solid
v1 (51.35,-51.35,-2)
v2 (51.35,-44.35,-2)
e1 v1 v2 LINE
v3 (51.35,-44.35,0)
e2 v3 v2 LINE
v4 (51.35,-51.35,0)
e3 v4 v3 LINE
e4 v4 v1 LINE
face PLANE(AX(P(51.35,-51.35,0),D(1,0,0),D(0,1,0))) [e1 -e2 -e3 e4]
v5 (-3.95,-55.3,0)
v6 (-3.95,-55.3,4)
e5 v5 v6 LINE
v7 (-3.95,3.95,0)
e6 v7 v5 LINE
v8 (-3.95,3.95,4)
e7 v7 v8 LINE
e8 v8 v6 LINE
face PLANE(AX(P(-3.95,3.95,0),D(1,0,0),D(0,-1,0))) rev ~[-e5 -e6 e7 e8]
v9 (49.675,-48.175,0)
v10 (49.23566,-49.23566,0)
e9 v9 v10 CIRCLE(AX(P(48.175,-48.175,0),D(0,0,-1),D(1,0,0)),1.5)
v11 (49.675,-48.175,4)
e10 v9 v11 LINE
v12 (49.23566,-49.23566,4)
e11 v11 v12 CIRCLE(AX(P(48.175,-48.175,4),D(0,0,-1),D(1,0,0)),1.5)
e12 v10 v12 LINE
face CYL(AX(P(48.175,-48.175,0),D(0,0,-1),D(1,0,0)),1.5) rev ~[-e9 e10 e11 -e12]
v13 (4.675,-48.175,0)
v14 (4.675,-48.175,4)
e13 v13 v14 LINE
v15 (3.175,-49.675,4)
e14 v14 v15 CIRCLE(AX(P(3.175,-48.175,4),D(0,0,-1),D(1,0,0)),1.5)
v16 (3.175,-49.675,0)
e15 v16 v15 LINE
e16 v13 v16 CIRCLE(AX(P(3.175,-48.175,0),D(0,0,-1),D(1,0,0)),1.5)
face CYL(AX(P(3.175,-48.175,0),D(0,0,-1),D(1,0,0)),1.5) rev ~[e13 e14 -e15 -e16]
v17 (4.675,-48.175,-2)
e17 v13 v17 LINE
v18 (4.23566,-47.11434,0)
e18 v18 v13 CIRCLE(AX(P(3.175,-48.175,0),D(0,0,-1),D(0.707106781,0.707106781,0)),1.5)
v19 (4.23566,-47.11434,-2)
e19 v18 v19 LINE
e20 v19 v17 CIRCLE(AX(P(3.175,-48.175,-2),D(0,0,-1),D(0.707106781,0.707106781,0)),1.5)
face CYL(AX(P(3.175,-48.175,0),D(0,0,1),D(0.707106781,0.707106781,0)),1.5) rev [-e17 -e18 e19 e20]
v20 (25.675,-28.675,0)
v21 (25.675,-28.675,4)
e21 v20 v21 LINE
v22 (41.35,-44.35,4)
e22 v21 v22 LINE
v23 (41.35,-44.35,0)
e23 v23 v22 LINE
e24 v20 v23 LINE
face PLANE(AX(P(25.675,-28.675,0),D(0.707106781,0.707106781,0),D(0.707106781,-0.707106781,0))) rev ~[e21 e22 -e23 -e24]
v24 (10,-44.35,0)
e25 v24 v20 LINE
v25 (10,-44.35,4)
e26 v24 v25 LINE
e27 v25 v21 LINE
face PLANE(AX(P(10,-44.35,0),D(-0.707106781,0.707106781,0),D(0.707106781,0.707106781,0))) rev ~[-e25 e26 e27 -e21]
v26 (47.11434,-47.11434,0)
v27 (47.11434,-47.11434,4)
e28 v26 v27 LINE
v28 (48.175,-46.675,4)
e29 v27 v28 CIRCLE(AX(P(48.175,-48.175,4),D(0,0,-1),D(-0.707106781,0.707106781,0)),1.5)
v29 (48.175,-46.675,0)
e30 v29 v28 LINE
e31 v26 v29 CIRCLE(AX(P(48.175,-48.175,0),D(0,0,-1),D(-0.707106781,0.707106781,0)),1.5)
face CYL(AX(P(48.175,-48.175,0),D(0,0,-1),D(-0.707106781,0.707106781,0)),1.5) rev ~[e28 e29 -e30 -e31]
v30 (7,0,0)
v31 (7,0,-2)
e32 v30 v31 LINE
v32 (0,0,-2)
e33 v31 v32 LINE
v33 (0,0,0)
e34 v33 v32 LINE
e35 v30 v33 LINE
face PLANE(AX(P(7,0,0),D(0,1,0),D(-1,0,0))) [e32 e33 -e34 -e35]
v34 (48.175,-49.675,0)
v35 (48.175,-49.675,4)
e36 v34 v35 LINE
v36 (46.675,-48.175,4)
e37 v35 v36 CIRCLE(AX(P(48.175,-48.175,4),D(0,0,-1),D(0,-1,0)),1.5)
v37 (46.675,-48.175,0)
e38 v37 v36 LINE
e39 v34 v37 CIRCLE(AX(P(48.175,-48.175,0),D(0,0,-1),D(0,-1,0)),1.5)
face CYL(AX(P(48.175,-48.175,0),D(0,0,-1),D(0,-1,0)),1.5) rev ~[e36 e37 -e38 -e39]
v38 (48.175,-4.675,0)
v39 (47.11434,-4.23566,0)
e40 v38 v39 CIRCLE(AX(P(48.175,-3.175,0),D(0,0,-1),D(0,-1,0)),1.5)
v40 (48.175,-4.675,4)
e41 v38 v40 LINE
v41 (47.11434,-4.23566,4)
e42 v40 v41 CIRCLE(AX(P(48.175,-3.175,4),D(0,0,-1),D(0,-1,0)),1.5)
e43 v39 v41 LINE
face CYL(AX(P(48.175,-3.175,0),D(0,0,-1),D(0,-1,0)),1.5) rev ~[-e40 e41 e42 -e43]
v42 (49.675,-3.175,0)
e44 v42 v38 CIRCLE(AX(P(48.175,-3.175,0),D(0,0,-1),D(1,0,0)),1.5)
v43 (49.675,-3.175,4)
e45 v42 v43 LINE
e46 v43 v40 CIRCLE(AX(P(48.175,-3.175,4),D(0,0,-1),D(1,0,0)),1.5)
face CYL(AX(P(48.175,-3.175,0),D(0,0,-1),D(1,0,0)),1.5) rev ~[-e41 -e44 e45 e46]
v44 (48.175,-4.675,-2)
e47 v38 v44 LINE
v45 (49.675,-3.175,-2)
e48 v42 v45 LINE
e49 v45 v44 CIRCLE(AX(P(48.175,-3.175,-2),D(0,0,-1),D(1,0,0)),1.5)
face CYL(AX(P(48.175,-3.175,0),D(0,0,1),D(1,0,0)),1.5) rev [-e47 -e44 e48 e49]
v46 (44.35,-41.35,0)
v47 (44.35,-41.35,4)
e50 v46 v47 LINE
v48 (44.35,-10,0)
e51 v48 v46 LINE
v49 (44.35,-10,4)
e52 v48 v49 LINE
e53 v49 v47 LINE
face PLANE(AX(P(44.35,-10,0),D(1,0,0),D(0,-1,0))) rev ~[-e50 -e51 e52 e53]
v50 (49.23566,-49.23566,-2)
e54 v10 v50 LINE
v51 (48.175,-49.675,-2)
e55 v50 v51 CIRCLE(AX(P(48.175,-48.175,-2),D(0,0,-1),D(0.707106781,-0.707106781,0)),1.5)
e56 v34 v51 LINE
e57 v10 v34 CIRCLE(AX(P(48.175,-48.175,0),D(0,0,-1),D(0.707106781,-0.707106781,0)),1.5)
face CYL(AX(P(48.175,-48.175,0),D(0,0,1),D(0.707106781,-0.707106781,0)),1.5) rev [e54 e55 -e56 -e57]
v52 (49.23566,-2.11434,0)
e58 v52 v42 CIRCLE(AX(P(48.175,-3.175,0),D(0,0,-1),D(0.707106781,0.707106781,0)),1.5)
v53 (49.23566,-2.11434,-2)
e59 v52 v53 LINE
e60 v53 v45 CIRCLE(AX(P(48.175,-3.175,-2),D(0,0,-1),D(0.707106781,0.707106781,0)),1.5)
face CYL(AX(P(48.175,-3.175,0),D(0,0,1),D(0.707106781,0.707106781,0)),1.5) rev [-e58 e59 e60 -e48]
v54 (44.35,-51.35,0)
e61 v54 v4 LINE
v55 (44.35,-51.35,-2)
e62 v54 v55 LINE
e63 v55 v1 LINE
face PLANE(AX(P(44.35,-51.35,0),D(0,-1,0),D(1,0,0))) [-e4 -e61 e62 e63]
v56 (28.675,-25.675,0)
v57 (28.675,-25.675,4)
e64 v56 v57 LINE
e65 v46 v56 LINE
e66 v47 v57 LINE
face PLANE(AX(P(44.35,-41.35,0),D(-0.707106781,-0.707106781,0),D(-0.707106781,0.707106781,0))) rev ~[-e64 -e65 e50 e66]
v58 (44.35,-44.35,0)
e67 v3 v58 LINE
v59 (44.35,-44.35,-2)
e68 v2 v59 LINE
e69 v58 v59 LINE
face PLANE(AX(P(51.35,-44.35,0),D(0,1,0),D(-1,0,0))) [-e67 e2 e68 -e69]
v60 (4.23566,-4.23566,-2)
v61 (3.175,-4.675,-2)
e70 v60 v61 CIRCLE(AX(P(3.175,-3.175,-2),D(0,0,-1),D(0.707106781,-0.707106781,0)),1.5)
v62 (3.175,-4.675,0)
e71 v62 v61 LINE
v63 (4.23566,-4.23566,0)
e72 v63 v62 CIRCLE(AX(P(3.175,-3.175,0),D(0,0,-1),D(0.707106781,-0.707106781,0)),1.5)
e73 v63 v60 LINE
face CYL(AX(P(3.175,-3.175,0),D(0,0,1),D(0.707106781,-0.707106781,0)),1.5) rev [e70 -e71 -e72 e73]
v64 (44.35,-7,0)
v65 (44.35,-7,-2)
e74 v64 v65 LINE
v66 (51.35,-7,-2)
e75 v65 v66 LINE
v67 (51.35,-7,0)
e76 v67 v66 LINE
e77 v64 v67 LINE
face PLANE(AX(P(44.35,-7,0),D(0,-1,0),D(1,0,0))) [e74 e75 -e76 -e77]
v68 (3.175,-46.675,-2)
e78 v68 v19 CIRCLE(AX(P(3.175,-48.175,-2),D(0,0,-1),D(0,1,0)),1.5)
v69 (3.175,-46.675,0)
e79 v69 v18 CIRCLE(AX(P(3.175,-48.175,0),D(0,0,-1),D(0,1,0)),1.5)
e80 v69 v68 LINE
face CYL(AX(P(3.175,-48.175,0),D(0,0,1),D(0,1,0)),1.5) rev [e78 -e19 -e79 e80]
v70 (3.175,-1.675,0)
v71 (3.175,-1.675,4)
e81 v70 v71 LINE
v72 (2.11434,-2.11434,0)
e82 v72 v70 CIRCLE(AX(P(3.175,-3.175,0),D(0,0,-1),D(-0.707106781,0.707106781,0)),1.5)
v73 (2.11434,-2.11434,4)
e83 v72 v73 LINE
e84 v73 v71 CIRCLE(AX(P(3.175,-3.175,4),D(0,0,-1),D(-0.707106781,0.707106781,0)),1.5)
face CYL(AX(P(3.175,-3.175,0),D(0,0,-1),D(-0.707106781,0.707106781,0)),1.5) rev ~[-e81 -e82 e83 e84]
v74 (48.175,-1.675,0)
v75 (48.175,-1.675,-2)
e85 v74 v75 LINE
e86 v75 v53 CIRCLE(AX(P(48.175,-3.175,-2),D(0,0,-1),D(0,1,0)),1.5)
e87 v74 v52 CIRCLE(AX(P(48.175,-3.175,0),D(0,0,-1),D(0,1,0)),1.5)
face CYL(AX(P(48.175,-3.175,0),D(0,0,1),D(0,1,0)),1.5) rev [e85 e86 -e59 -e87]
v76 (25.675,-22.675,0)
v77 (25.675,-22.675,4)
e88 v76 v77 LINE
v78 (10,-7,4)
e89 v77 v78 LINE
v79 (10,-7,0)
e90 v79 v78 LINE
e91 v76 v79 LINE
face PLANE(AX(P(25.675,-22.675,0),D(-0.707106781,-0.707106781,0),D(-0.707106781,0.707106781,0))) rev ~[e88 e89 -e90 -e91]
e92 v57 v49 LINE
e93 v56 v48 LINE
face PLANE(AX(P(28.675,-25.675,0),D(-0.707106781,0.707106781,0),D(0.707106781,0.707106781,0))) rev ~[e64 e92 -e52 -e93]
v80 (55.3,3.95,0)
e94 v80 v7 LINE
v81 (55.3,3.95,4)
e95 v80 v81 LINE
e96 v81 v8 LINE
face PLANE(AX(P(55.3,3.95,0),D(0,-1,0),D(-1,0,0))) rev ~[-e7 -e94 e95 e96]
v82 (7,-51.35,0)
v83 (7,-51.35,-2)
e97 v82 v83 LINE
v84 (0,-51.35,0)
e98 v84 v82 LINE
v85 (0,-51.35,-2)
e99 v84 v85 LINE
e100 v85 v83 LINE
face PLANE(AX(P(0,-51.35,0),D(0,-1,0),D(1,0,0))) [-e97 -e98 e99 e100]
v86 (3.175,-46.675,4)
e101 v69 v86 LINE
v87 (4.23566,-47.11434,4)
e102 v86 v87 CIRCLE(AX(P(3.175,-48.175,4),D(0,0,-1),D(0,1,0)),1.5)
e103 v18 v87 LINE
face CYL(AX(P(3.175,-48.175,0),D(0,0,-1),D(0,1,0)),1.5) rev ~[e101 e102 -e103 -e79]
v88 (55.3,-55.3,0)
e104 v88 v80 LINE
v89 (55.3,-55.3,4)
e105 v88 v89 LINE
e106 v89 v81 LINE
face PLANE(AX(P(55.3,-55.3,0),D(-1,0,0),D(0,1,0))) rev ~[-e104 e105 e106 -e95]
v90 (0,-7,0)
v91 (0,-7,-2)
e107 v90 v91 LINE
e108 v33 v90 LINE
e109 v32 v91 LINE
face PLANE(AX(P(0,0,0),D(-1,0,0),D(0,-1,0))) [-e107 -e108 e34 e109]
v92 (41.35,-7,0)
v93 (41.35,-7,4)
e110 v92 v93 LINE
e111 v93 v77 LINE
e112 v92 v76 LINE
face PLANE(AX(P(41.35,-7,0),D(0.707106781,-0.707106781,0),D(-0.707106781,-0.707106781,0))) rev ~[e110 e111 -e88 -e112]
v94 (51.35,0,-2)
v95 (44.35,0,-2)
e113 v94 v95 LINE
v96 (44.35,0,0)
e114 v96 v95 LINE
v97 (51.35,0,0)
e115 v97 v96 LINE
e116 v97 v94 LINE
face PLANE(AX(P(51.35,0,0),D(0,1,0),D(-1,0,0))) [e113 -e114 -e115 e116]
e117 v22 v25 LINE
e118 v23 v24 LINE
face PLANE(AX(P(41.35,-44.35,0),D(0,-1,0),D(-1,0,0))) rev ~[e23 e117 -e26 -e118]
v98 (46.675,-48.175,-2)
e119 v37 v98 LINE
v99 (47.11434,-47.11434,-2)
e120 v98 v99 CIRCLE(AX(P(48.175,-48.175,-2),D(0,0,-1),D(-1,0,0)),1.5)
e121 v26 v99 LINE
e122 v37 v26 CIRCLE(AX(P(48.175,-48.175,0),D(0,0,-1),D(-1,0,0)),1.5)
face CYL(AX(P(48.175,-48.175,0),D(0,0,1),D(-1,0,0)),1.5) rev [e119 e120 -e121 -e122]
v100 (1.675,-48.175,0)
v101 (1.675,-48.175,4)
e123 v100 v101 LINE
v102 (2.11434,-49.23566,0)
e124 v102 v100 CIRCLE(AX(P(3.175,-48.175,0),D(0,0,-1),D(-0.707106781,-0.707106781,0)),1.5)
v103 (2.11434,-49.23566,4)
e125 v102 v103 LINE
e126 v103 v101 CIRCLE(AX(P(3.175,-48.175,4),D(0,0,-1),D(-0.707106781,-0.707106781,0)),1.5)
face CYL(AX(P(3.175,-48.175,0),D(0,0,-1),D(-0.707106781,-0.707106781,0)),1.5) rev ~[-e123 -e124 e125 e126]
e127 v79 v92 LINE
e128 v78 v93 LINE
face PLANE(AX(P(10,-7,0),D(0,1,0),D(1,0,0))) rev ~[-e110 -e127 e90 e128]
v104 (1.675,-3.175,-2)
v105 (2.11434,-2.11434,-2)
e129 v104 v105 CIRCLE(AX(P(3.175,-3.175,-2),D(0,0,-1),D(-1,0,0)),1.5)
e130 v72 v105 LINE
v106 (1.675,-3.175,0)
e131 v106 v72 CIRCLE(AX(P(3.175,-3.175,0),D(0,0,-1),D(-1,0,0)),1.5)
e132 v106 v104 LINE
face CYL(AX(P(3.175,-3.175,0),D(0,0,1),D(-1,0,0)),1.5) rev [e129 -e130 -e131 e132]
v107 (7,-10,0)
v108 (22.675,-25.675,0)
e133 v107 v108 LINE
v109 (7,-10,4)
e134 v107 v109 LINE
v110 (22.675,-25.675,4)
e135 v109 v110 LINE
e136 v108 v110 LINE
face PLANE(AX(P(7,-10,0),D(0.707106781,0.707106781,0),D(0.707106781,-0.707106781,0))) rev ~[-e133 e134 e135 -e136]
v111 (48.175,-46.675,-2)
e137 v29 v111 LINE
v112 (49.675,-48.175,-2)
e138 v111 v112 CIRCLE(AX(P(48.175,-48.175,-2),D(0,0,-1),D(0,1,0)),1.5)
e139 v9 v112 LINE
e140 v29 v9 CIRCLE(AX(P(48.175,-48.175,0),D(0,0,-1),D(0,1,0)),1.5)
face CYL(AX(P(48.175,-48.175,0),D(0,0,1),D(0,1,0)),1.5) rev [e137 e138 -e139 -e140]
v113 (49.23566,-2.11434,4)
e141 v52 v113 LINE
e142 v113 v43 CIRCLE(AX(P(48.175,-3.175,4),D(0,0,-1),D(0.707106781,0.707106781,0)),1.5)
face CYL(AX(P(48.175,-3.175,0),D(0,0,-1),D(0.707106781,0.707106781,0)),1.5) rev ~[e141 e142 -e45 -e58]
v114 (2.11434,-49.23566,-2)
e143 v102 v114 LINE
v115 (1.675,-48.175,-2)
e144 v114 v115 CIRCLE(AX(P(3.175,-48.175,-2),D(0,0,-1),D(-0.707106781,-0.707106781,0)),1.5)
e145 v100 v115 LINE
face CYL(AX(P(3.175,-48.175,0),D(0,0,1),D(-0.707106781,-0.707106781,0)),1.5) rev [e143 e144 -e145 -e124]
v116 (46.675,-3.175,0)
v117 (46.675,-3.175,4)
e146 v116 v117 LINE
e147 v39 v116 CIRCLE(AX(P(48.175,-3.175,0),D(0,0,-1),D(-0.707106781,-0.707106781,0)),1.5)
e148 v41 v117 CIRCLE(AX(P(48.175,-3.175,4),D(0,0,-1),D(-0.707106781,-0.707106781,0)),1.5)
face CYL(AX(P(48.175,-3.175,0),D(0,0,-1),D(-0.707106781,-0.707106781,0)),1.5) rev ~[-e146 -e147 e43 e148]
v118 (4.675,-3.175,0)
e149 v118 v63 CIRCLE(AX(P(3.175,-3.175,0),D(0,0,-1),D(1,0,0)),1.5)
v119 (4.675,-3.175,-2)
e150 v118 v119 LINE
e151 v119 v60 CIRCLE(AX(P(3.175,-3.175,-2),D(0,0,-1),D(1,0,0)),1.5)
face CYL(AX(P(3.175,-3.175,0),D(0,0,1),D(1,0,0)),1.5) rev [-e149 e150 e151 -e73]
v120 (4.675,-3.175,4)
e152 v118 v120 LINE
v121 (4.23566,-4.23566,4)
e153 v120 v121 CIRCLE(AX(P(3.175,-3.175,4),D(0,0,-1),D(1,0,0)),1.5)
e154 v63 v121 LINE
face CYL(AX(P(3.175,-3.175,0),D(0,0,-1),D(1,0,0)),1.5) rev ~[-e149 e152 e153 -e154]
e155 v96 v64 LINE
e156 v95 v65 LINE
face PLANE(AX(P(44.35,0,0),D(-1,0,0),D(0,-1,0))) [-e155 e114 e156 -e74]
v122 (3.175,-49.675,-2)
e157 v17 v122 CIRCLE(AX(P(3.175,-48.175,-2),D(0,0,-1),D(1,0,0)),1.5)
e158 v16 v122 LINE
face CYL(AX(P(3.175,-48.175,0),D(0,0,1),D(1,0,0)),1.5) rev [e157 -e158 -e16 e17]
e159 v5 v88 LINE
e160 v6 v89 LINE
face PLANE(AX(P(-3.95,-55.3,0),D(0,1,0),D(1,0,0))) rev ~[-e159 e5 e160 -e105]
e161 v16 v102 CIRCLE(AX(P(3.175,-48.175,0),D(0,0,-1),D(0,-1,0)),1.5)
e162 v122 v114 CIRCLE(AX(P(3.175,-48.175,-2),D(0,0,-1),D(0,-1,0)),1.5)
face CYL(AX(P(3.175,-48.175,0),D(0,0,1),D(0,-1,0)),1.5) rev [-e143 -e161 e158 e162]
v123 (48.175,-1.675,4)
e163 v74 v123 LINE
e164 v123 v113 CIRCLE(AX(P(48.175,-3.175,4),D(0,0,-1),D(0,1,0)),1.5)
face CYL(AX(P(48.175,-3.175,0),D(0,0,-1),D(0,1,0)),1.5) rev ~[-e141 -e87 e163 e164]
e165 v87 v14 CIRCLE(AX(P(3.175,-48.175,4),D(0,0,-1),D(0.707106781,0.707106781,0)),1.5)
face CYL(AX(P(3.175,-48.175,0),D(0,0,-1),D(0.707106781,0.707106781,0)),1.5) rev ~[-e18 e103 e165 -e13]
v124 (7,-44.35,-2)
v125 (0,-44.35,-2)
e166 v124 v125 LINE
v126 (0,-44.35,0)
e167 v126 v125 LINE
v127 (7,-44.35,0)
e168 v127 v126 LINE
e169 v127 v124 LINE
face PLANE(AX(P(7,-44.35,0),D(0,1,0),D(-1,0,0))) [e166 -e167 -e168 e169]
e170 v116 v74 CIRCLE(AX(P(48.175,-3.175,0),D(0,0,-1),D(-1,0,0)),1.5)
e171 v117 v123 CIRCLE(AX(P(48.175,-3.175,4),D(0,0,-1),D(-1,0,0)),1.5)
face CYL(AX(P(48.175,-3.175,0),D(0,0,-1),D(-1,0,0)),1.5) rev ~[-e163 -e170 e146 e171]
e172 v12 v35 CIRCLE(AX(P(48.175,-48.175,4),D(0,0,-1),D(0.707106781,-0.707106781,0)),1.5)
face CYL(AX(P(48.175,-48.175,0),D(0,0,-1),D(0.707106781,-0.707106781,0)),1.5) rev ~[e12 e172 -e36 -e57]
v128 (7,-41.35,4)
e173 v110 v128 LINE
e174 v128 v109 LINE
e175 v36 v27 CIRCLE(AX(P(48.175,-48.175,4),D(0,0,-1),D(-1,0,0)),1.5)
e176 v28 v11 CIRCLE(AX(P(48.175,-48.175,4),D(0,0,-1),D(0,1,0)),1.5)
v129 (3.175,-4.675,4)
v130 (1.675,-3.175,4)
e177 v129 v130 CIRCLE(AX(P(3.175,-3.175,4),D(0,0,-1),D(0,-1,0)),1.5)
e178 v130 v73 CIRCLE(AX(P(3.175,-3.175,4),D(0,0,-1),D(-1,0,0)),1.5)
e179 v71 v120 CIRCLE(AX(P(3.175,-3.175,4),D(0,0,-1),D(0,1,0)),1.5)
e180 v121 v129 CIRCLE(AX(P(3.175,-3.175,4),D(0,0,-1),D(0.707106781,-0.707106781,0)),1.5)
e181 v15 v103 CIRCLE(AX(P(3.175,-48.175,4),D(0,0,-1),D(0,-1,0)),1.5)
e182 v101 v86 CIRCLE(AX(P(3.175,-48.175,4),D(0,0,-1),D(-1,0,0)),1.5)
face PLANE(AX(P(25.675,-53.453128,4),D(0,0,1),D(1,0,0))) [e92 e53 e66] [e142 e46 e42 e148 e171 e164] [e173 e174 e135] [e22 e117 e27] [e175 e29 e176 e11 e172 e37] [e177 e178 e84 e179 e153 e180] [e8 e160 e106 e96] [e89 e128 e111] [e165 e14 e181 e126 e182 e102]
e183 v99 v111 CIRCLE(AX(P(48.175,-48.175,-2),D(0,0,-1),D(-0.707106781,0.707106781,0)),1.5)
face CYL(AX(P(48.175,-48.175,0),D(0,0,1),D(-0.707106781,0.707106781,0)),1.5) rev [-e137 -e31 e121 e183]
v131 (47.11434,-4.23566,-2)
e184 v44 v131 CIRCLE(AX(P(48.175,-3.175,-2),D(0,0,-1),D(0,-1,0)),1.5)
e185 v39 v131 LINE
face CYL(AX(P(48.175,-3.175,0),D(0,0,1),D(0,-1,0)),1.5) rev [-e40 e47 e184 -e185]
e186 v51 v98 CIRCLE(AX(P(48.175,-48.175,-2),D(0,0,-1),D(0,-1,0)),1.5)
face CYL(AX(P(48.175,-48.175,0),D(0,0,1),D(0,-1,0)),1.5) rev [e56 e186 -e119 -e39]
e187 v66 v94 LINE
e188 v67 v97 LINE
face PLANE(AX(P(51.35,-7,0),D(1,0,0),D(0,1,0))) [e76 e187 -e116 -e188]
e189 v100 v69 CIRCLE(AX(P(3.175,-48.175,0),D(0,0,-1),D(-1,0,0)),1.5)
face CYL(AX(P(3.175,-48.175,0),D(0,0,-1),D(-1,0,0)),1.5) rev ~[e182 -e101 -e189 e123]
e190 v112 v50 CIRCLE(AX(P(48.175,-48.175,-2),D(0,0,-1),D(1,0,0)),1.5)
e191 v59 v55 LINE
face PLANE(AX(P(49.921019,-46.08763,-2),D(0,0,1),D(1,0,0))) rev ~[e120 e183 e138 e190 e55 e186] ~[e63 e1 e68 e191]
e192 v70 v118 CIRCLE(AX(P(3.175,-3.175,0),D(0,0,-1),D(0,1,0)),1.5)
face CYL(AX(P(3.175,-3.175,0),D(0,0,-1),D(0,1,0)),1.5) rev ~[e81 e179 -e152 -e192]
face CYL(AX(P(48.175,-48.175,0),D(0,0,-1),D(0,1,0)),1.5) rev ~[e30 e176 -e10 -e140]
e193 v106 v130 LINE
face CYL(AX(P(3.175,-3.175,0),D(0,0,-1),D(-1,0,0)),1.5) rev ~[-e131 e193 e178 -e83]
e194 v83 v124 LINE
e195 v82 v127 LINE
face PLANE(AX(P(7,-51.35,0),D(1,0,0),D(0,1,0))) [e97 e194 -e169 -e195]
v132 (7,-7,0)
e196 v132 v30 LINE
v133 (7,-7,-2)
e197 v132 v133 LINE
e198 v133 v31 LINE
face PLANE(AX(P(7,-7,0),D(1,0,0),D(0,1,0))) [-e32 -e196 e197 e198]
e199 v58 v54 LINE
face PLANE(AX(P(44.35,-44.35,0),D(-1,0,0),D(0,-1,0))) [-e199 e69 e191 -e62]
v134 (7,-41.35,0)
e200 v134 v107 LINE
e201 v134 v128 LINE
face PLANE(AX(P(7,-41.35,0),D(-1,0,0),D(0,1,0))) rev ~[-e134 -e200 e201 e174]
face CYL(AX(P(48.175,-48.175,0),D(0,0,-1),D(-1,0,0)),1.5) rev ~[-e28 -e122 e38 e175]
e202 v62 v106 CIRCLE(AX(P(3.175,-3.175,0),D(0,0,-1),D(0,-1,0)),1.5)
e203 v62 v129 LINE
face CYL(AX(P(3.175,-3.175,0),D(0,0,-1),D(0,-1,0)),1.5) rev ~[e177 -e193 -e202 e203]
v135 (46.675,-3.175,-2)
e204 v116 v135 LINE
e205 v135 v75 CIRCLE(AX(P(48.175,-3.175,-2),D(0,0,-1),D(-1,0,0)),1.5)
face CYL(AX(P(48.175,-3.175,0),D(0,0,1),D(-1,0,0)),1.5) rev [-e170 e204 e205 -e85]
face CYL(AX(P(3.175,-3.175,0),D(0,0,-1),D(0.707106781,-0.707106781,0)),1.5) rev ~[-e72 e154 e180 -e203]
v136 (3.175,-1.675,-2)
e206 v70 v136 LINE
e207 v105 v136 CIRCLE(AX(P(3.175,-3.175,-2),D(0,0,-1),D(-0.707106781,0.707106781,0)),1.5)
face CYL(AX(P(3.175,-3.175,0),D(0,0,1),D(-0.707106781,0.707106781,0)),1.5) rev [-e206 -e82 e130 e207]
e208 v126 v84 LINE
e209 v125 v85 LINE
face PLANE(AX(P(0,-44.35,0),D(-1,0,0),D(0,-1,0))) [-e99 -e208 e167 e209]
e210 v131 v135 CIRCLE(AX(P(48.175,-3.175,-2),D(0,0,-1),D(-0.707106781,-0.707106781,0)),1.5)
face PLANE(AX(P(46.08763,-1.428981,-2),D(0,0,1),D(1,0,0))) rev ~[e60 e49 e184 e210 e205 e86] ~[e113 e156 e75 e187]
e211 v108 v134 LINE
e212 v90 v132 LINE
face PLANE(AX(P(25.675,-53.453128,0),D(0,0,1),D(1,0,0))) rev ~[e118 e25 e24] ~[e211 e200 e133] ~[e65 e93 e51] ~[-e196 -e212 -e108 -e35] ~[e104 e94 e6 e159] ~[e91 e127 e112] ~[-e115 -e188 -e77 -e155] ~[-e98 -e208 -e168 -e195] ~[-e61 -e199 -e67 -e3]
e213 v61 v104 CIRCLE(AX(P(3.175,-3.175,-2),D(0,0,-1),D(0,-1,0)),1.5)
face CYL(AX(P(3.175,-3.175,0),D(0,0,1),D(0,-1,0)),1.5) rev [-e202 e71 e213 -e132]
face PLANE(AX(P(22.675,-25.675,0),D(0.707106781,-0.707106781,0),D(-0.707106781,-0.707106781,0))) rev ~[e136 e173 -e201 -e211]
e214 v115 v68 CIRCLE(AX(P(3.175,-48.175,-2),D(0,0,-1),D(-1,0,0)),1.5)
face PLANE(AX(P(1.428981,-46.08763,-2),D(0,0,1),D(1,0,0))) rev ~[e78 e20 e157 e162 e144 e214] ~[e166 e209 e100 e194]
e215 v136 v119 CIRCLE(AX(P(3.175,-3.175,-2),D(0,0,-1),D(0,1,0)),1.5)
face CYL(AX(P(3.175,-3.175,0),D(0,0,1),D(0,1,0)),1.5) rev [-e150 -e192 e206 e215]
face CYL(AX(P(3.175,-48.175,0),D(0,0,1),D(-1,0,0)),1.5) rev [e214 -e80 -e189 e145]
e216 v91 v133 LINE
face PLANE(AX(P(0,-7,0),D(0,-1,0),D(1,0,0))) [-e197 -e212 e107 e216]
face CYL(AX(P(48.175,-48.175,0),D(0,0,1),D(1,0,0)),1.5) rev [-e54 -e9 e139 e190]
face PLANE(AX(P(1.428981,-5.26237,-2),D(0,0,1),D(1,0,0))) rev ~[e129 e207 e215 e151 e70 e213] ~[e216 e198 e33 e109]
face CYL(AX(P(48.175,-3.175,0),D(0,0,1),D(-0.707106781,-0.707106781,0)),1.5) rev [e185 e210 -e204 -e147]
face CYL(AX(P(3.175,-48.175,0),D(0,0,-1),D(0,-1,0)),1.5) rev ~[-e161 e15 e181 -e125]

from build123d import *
from build123d import SkipClean  # not in build123d's __all__

# Parameters (mm, degrees)
F0_W     = 3.175
F0_H     = 37.35
F0_W_2   = 37.35
F0_H_2   = 3.175
F1_DEPTH = 4
F2_DEPTH = 2


# Not quite as in the source:
# - a feature names something its author has since deleted; it is built from what else it names


with BuildPart() as f1:
    # F0 (on Top) → F1 (new body)
    with BuildSketch(Plane.XY):
        Polygon((0, -51.35), (-3.95, -55.3), (55.3, -55.3), (51.35, -51.35), (48.175, -51.35), (44.35, -51.35), (7, -51.35), (3.175, -51.35), align=None)
        with Locations((1.5875, -25.675)):
            Rectangle(F0_W, F0_H)
        with Locations((25.675, -49.7625)):
            Rectangle(F0_W_2, F0_H_2)
        with BuildLine():
            Line((3.175, -44.35), (0, -44.35))
            Line((0, -44.35), (0, -48.175))
            Line((0, -48.175), (1.675, -48.175))
            ThreePointArc((1.675, -48.175), (2.1143398282, -47.1143398282), (3.175, -46.675))
            Line((3.175, -46.675), (3.175, -44.35))
        make_face()
        with BuildLine():
            Line((7, -44.35), (3.175, -44.35))
            Line((3.175, -44.35), (3.175, -46.675))
            ThreePointArc((3.175, -46.675), (3.7490251485, -46.7891807012), (4.2356601718, -47.1143398282))
            Line((4.2356601718, -47.1143398282), (7, -44.35))
        make_face()
        with BuildLine():
            Line((2.1143398282, -49.2356601718), (0, -51.35))
            Line((0, -51.35), (3.175, -51.35))
            Line((3.175, -51.35), (3.175, -49.675))
            ThreePointArc((3.175, -49.675), (2.6009748515, -49.5608192988), (2.1143398282, -49.2356601718))
        make_face()
        Polygon((0, -3.175), (0, 0), (-3.95, 3.95), (-3.95, -55.3), (0, -51.35), (0, -48.175), (0, -44.35), (0, -7), align=None)
        Polygon((-3.95, 3.95), (0, 0), (3.175, 0), (7, 0), (44.35, 0), (48.175, 0), (51.35, 0), (55.3, 3.95), align=None)
        with Locations((25.675, -1.5875)):
            Rectangle(F0_W_2, F0_H_2)
        Polygon((55.3, -55.3), (55.3, 3.95), (51.35, 0), (51.35, -3.175), (51.35, -7), (51.35, -44.35), (51.35, -48.175), (51.35, -51.35), align=None)
        with Locations((49.7625, -25.675)):
            Rectangle(F0_W, F0_H)
        with BuildLine():
            Line((49.2356601718, -49.2356601718), (51.35, -51.35))
            Line((51.35, -51.35), (51.35, -48.175))
            Line((51.35, -48.175), (49.675, -48.175))
            ThreePointArc((49.675, -48.175), (49.5608192988, -48.7490251485), (49.2356601718, -49.2356601718))
        make_face()
        with BuildLine():
            Line((49.675, -48.175), (51.35, -48.175))
            Line((51.35, -48.175), (51.35, -44.35))
            Line((51.35, -44.35), (48.175, -44.35))
            Line((48.175, -44.35), (48.175, -46.675))
            ThreePointArc((48.175, -46.675), (49.2356601718, -47.1143398282), (49.675, -48.175))
        make_face()
        with BuildLine():
            Line((48.175, -46.675), (48.175, -44.35))
            Line((48.175, -44.35), (44.35, -44.35))
            Line((44.35, -44.35), (47.1143398282, -47.1143398282))
            ThreePointArc((47.1143398282, -47.1143398282), (47.6009748515, -46.7891807012), (48.175, -46.675))
        make_face()
        Polygon((7, -41.3499998236), (7, -44.35), (8.5000000882, -42.8499999118), align=None)
        Polygon((8.5000000882, -42.8499999118), (7, -44.35), (10.0000001764, -44.35), align=None)
        Polygon((8.5000000882, -42.8499999118), (10.0000001764, -44.35), (25.6750000882, -28.6750000882), (24.175, -27.175), align=None)
        Polygon((22.6749999118, -25.6749999118), (7, -41.3499998236), (8.5000000882, -42.8499999118), (24.175, -27.175), align=None)
        Polygon((8.5, -8.5), (7, -10), (22.6749999118, -25.6749999118), (24.1749999118, -24.1749999118), align=None)
        Polygon((25.6749999118, -22.6749999118), (10, -7), (8.5, -8.5), (24.1749999118, -24.1749999118), align=None)
        Polygon((27.175, -24.175), (25.6749999118, -22.6749999118), (24.1749999118, -24.1749999118), (25.675, -25.675), align=None)
        Polygon((27.1750000882, -27.1750000882), (28.6750000882, -25.6750000882), (27.175, -24.175), (25.675, -25.675), align=None)
        Polygon((25.675, -25.675), (24.175, -27.175), (25.6750000882, -28.6750000882), (27.1750000882, -27.1750000882), align=None)
        Polygon((24.1749999118, -24.1749999118), (22.6749999118, -25.6749999118), (24.175, -27.175), (25.675, -25.675), align=None)
        Polygon((25.6750000882, -28.6750000882), (41.35, -44.35), (42.85, -42.85), (27.1750000882, -27.1750000882), align=None)
        Polygon((42.85, -42.85), (44.35, -41.35), (28.6750000882, -25.6750000882), (27.1750000882, -27.1750000882), align=None)
        Polygon((8.5, -8.5), (7, -7), (7, -10), align=None)
        Polygon((10, -7), (7, -7), (8.5, -8.5), align=None)
        Polygon((28.6750000882, -25.6750000882), (44.35, -10.0000001764), (42.8499999118, -8.5000000882), (27.175, -24.175), align=None)
        Polygon((42.8499999118, -8.5000000882), (41.3499998236, -7), (25.6749999118, -22.6749999118), (27.175, -24.175), align=None)
        Polygon((44.35, -10.0000001764), (44.35, -7), (42.8499999118, -8.5000000882), align=None)
        Polygon((44.35, -44.35), (44.35, -41.35), (42.85, -42.85), align=None)
        Polygon((42.85, -42.85), (41.35, -44.35), (44.35, -44.35), align=None)
        Polygon((42.8499999118, -8.5000000882), (44.35, -7), (41.3499998236, -7), align=None)
        with BuildLine():
            Line((0, -48.175), (0, -51.35))
            Line((0, -51.35), (2.1143398282, -49.2356601718))
            ThreePointArc((2.1143398282, -49.2356601718), (1.7891807012, -48.7490251485), (1.675, -48.175))
            Line((1.675, -48.175), (0, -48.175))
        make_face()
        with BuildLine():
            Line((3.175, -49.675), (3.175, -51.35))
            Line((3.175, -51.35), (7, -51.35))
            Line((7, -51.35), (7, -48.175))
            Line((7, -48.175), (4.675, -48.175))
            ThreePointArc((4.675, -48.175), (4.2356601718, -49.2356601718), (3.175, -49.675))
        make_face()
        with BuildLine():
            Line((7, -48.175), (7, -44.35))
            Line((7, -44.35), (4.2356601718, -47.1143398282))
            ThreePointArc((4.2356601718, -47.1143398282), (4.5608192988, -47.6009748515), (4.675, -48.175))
            Line((4.675, -48.175), (7, -48.175))
        make_face()
        with BuildLine():
            Line((44.35, -51.35), (48.175, -51.35))
            Line((48.175, -51.35), (48.175, -49.675))
            ThreePointArc((48.175, -49.675), (47.1143398282, -49.2356601718), (46.675, -48.175))
            Line((46.675, -48.175), (44.35, -48.175))
            Line((44.35, -48.175), (44.35, -51.35))
        make_face()
        with BuildLine():
            Line((44.35, -44.35), (44.35, -48.175))
            Line((44.35, -48.175), (46.675, -48.175))
            ThreePointArc((46.675, -48.175), (46.7891807012, -47.6009748515), (47.1143398282, -47.1143398282))
            Line((47.1143398282, -47.1143398282), (44.35, -44.35))
        make_face()
        with BuildLine():
            Line((48.175, -51.35), (51.35, -51.35))
            Line((51.35, -51.35), (49.2356601718, -49.2356601718))
            ThreePointArc((49.2356601718, -49.2356601718), (48.7490251485, -49.5608192988), (48.175, -49.675))
            Line((48.175, -49.675), (48.175, -51.35))
        make_face()
        with BuildLine():
            Line((48.175, 0), (44.35, 0))
            Line((44.35, 0), (44.35, -3.175))
            Line((44.35, -3.175), (46.675, -3.175))
            ThreePointArc((46.675, -3.175), (47.1143398282, -2.1143398282), (48.175, -1.675))
            Line((48.175, -1.675), (48.175, 0))
        make_face()
        with BuildLine():
            Line((46.675, -3.175), (44.35, -3.175))
            Line((44.35, -3.175), (44.35, -7))
            Line((44.35, -7), (47.1143398282, -4.2356601718))
            ThreePointArc((47.1143398282, -4.2356601718), (46.7891807012, -3.7490251485), (46.675, -3.175))
        make_face()
        with BuildLine():
            Line((49.2356601718, -2.1143398282), (51.35, 0))
            Line((51.35, 0), (48.175, 0))
            Line((48.175, 0), (48.175, -1.675))
            ThreePointArc((48.175, -1.675), (48.7490251485, -1.7891807012), (49.2356601718, -2.1143398282))
        make_face()
        with BuildLine():
            Line((7, 0), (3.175, 0))
            Line((3.175, 0), (3.175, -1.675))
            ThreePointArc((3.175, -1.675), (4.2356601718, -2.1143398282), (4.675, -3.175))
            Line((4.675, -3.175), (7, -3.175))
            Line((7, -3.175), (7, 0))
        make_face()
        with BuildLine():
            Line((7, -7), (7, -3.175))
            Line((7, -3.175), (4.675, -3.175))
            ThreePointArc((4.675, -3.175), (4.5608192988, -3.7490251485), (4.2356601718, -4.2356601718))
            Line((4.2356601718, -4.2356601718), (7, -7))
        make_face()
        with BuildLine():
            Line((3.175, -4.675), (3.175, -7))
            Line((3.175, -7), (7, -7))
            Line((7, -7), (4.2356601718, -4.2356601718))
            ThreePointArc((4.2356601718, -4.2356601718), (3.7490251485, -4.5608192988), (3.175, -4.675))
        make_face()
        with BuildLine():
            Line((1.675, -3.175), (0, -3.175))
            Line((0, -3.175), (0, -7))
            Line((0, -7), (3.175, -7))
            Line((3.175, -7), (3.175, -4.675))
            ThreePointArc((3.175, -4.675), (2.1143398282, -4.2356601718), (1.675, -3.175))
        make_face()
        with BuildLine():
            Line((2.1143398282, -2.1143398282), (0, 0))
            Line((0, 0), (0, -3.175))
            Line((0, -3.175), (1.675, -3.175))
            ThreePointArc((1.675, -3.175), (1.7891807012, -2.6009748515), (2.1143398282, -2.1143398282))
        make_face()
        Polygon((44.35, -3.175), (7, -3.175), (7, -7), (10, -7), (41.3499998236, -7), (44.35, -7), align=None)
        Polygon((7, -7), (3.175, -7), (3.175, -44.35), (7, -44.35), (7, -41.3499998236), (7, -10), align=None)
        with BuildLine():
            Line((51.35, -3.175), (51.35, 0))
            Line((51.35, 0), (49.2356601718, -2.1143398282))
            ThreePointArc((49.2356601718, -2.1143398282), (49.5608192988, -2.6009748515), (49.675, -3.175))
            Line((49.675, -3.175), (51.35, -3.175))
        make_face()
        with BuildLine():
            Line((51.35, -7), (51.35, -3.175))
            Line((51.35, -3.175), (49.675, -3.175))
            ThreePointArc((49.675, -3.175), (49.2356601718, -4.2356601718), (48.175, -4.675))
            Line((48.175, -4.675), (48.175, -7))
            Line((48.175, -7), (51.35, -7))
        make_face()
        with BuildLine():
            Line((47.1143398282, -4.2356601718), (44.35, -7))
            Line((44.35, -7), (48.175, -7))
            Line((48.175, -7), (48.175, -4.675))
            ThreePointArc((48.175, -4.675), (47.6009748515, -4.5608192988), (47.1143398282, -4.2356601718))
        make_face()
        Polygon((48.175, -7), (44.35, -7), (44.35, -10.0000001764), (44.35, -41.35), (44.35, -44.35), (48.175, -44.35), align=None)
        Polygon((10.0000001764, -44.35), (7, -44.35), (7, -48.175), (44.35, -48.175), (44.35, -44.35), (41.35, -44.35), align=None)
        with BuildLine():
            Line((3.175, 0), (0, 0))
            Line((0, 0), (2.1143398282, -2.1143398282))
            ThreePointArc((2.1143398282, -2.1143398282), (2.6009748515, -1.7891807012), (3.175, -1.675))
            Line((3.175, -1.675), (3.175, 0))
        make_face()
    extrude(amount=F1_DEPTH)

    # F0 (on Top) → F2 (join)
    with BuildSketch(Plane.XY):
        with BuildLine():
            Line((3.175, -44.35), (0, -44.35))
            Line((0, -44.35), (0, -48.175))
            Line((0, -48.175), (1.675, -48.175))
            ThreePointArc((1.675, -48.175), (2.1143398282, -47.1143398282), (3.175, -46.675))
            Line((3.175, -46.675), (3.175, -44.35))
        make_face()
        with BuildLine():
            Line((7, -44.35), (3.175, -44.35))
            Line((3.175, -44.35), (3.175, -46.675))
            ThreePointArc((3.175, -46.675), (3.7490251485, -46.7891807012), (4.2356601718, -47.1143398282))
            Line((4.2356601718, -47.1143398282), (7, -44.35))
        make_face()
        with BuildLine():
            Line((2.1143398282, -49.2356601718), (0, -51.35))
            Line((0, -51.35), (3.175, -51.35))
            Line((3.175, -51.35), (3.175, -49.675))
            ThreePointArc((3.175, -49.675), (2.6009748515, -49.5608192988), (2.1143398282, -49.2356601718))
        make_face()
        with BuildLine():
            Line((49.675, -48.175), (51.35, -48.175))
            Line((51.35, -48.175), (51.35, -44.35))
            Line((51.35, -44.35), (48.175, -44.35))
            Line((48.175, -44.35), (48.175, -46.675))
            ThreePointArc((48.175, -46.675), (49.2356601718, -47.1143398282), (49.675, -48.175))
        make_face()
        with BuildLine():
            Line((48.175, -46.675), (48.175, -44.35))
            Line((48.175, -44.35), (44.35, -44.35))
            Line((44.35, -44.35), (47.1143398282, -47.1143398282))
            ThreePointArc((47.1143398282, -47.1143398282), (47.6009748515, -46.7891807012), (48.175, -46.675))
        make_face()
        with BuildLine():
            Line((49.2356601718, -49.2356601718), (51.35, -51.35))
            Line((51.35, -51.35), (51.35, -48.175))
            Line((51.35, -48.175), (49.675, -48.175))
            ThreePointArc((49.675, -48.175), (49.5608192988, -48.7490251485), (49.2356601718, -49.2356601718))
        make_face()
        with BuildLine():
            Line((3.175, -49.675), (3.175, -51.35))
            Line((3.175, -51.35), (7, -51.35))
            Line((7, -51.35), (7, -48.175))
            Line((7, -48.175), (4.675, -48.175))
            ThreePointArc((4.675, -48.175), (4.2356601718, -49.2356601718), (3.175, -49.675))
        make_face()
        with BuildLine():
            Line((7, -48.175), (7, -44.35))
            Line((7, -44.35), (4.2356601718, -47.1143398282))
            ThreePointArc((4.2356601718, -47.1143398282), (4.5608192988, -47.6009748515), (4.675, -48.175))
            Line((4.675, -48.175), (7, -48.175))
        make_face()
        with BuildLine():
            Line((0, -48.175), (0, -51.35))
            Line((0, -51.35), (2.1143398282, -49.2356601718))
            ThreePointArc((2.1143398282, -49.2356601718), (1.7891807012, -48.7490251485), (1.675, -48.175))
            Line((1.675, -48.175), (0, -48.175))
        make_face()
        with BuildLine():
            Line((44.35, -51.35), (48.175, -51.35))
            Line((48.175, -51.35), (48.175, -49.675))
            ThreePointArc((48.175, -49.675), (47.1143398282, -49.2356601718), (46.675, -48.175))
            Line((46.675, -48.175), (44.35, -48.175))
            Line((44.35, -48.175), (44.35, -51.35))
        make_face()
        with BuildLine():
            Line((44.35, -44.35), (44.35, -48.175))
            Line((44.35, -48.175), (46.675, -48.175))
            ThreePointArc((46.675, -48.175), (46.7891807012, -47.6009748515), (47.1143398282, -47.1143398282))
            Line((47.1143398282, -47.1143398282), (44.35, -44.35))
        make_face()
        with BuildLine():
            Line((48.175, -51.35), (51.35, -51.35))
            Line((51.35, -51.35), (49.2356601718, -49.2356601718))
            ThreePointArc((49.2356601718, -49.2356601718), (48.7490251485, -49.5608192988), (48.175, -49.675))
            Line((48.175, -49.675), (48.175, -51.35))
        make_face()
        with BuildLine():
            Line((48.175, 0), (44.35, 0))
            Line((44.35, 0), (44.35, -3.175))
            Line((44.35, -3.175), (46.675, -3.175))
            ThreePointArc((46.675, -3.175), (47.1143398282, -2.1143398282), (48.175, -1.675))
            Line((48.175, -1.675), (48.175, 0))
        make_face()
        with BuildLine():
            Line((46.675, -3.175), (44.35, -3.175))
            Line((44.35, -3.175), (44.35, -7))
            Line((44.35, -7), (47.1143398282, -4.2356601718))
            ThreePointArc((47.1143398282, -4.2356601718), (46.7891807012, -3.7490251485), (46.675, -3.175))
        make_face()
        with BuildLine():
            Line((49.2356601718, -2.1143398282), (51.35, 0))
            Line((51.35, 0), (48.175, 0))
            Line((48.175, 0), (48.175, -1.675))
            ThreePointArc((48.175, -1.675), (48.7490251485, -1.7891807012), (49.2356601718, -2.1143398282))
        make_face()
        with BuildLine():
            Line((1.675, -3.175), (0, -3.175))
            Line((0, -3.175), (0, -7))
            Line((0, -7), (3.175, -7))
            Line((3.175, -7), (3.175, -4.675))
            ThreePointArc((3.175, -4.675), (2.1143398282, -4.2356601718), (1.675, -3.175))
        make_face()
        with BuildLine():
            Line((3.175, -4.675), (3.175, -7))
            Line((3.175, -7), (7, -7))
            Line((7, -7), (4.2356601718, -4.2356601718))
            ThreePointArc((4.2356601718, -4.2356601718), (3.7490251485, -4.5608192988), (3.175, -4.675))
        make_face()
        with BuildLine():
            Line((7, -7), (7, -3.175))
            Line((7, -3.175), (4.675, -3.175))
            ThreePointArc((4.675, -3.175), (4.5608192988, -3.7490251485), (4.2356601718, -4.2356601718))
            Line((4.2356601718, -4.2356601718), (7, -7))
        make_face()
        with BuildLine():
            Line((3.175, 0), (0, 0))
            Line((0, 0), (2.1143398282, -2.1143398282))
            ThreePointArc((2.1143398282, -2.1143398282), (2.6009748515, -1.7891807012), (3.175, -1.675))
            Line((3.175, -1.675), (3.175, 0))
        make_face()
        with BuildLine():
            Line((2.1143398282, -2.1143398282), (0, 0))
            Line((0, 0), (0, -3.175))
            Line((0, -3.175), (1.675, -3.175))
            ThreePointArc((1.675, -3.175), (1.7891807012, -2.6009748515), (2.1143398282, -2.1143398282))
        make_face()
        with BuildLine():
            Line((7, 0), (3.175, 0))
            Line((3.175, 0), (3.175, -1.675))
            ThreePointArc((3.175, -1.675), (4.2356601718, -2.1143398282), (4.675, -3.175))
            Line((4.675, -3.175), (7, -3.175))
            Line((7, -3.175), (7, 0))
        make_face()
        with BuildLine():
            Line((51.35, -3.175), (51.35, 0))
            Line((51.35, 0), (49.2356601718, -2.1143398282))
            ThreePointArc((49.2356601718, -2.1143398282), (49.5608192988, -2.6009748515), (49.675, -3.175))
            Line((49.675, -3.175), (51.35, -3.175))
        make_face()
        with BuildLine():
            Line((51.35, -7), (51.35, -3.175))
            Line((51.35, -3.175), (49.675, -3.175))
            ThreePointArc((49.675, -3.175), (49.2356601718, -4.2356601718), (48.175, -4.675))
            Line((48.175, -4.675), (48.175, -7))
            Line((48.175, -7), (51.35, -7))
        make_face()
        with BuildLine():
            Line((47.1143398282, -4.2356601718), (44.35, -7))
            Line((44.35, -7), (48.175, -7))
            Line((48.175, -7), (48.175, -4.675))
            ThreePointArc((48.175, -4.675), (47.6009748515, -4.5608192988), (47.1143398282, -4.2356601718))
        make_face()
    with SkipClean():  # cleaning this boolean's faces spoils the solid; the shape is the same uncleaned
        extrude(amount=-F2_DEPTH)


solid = f1.part
